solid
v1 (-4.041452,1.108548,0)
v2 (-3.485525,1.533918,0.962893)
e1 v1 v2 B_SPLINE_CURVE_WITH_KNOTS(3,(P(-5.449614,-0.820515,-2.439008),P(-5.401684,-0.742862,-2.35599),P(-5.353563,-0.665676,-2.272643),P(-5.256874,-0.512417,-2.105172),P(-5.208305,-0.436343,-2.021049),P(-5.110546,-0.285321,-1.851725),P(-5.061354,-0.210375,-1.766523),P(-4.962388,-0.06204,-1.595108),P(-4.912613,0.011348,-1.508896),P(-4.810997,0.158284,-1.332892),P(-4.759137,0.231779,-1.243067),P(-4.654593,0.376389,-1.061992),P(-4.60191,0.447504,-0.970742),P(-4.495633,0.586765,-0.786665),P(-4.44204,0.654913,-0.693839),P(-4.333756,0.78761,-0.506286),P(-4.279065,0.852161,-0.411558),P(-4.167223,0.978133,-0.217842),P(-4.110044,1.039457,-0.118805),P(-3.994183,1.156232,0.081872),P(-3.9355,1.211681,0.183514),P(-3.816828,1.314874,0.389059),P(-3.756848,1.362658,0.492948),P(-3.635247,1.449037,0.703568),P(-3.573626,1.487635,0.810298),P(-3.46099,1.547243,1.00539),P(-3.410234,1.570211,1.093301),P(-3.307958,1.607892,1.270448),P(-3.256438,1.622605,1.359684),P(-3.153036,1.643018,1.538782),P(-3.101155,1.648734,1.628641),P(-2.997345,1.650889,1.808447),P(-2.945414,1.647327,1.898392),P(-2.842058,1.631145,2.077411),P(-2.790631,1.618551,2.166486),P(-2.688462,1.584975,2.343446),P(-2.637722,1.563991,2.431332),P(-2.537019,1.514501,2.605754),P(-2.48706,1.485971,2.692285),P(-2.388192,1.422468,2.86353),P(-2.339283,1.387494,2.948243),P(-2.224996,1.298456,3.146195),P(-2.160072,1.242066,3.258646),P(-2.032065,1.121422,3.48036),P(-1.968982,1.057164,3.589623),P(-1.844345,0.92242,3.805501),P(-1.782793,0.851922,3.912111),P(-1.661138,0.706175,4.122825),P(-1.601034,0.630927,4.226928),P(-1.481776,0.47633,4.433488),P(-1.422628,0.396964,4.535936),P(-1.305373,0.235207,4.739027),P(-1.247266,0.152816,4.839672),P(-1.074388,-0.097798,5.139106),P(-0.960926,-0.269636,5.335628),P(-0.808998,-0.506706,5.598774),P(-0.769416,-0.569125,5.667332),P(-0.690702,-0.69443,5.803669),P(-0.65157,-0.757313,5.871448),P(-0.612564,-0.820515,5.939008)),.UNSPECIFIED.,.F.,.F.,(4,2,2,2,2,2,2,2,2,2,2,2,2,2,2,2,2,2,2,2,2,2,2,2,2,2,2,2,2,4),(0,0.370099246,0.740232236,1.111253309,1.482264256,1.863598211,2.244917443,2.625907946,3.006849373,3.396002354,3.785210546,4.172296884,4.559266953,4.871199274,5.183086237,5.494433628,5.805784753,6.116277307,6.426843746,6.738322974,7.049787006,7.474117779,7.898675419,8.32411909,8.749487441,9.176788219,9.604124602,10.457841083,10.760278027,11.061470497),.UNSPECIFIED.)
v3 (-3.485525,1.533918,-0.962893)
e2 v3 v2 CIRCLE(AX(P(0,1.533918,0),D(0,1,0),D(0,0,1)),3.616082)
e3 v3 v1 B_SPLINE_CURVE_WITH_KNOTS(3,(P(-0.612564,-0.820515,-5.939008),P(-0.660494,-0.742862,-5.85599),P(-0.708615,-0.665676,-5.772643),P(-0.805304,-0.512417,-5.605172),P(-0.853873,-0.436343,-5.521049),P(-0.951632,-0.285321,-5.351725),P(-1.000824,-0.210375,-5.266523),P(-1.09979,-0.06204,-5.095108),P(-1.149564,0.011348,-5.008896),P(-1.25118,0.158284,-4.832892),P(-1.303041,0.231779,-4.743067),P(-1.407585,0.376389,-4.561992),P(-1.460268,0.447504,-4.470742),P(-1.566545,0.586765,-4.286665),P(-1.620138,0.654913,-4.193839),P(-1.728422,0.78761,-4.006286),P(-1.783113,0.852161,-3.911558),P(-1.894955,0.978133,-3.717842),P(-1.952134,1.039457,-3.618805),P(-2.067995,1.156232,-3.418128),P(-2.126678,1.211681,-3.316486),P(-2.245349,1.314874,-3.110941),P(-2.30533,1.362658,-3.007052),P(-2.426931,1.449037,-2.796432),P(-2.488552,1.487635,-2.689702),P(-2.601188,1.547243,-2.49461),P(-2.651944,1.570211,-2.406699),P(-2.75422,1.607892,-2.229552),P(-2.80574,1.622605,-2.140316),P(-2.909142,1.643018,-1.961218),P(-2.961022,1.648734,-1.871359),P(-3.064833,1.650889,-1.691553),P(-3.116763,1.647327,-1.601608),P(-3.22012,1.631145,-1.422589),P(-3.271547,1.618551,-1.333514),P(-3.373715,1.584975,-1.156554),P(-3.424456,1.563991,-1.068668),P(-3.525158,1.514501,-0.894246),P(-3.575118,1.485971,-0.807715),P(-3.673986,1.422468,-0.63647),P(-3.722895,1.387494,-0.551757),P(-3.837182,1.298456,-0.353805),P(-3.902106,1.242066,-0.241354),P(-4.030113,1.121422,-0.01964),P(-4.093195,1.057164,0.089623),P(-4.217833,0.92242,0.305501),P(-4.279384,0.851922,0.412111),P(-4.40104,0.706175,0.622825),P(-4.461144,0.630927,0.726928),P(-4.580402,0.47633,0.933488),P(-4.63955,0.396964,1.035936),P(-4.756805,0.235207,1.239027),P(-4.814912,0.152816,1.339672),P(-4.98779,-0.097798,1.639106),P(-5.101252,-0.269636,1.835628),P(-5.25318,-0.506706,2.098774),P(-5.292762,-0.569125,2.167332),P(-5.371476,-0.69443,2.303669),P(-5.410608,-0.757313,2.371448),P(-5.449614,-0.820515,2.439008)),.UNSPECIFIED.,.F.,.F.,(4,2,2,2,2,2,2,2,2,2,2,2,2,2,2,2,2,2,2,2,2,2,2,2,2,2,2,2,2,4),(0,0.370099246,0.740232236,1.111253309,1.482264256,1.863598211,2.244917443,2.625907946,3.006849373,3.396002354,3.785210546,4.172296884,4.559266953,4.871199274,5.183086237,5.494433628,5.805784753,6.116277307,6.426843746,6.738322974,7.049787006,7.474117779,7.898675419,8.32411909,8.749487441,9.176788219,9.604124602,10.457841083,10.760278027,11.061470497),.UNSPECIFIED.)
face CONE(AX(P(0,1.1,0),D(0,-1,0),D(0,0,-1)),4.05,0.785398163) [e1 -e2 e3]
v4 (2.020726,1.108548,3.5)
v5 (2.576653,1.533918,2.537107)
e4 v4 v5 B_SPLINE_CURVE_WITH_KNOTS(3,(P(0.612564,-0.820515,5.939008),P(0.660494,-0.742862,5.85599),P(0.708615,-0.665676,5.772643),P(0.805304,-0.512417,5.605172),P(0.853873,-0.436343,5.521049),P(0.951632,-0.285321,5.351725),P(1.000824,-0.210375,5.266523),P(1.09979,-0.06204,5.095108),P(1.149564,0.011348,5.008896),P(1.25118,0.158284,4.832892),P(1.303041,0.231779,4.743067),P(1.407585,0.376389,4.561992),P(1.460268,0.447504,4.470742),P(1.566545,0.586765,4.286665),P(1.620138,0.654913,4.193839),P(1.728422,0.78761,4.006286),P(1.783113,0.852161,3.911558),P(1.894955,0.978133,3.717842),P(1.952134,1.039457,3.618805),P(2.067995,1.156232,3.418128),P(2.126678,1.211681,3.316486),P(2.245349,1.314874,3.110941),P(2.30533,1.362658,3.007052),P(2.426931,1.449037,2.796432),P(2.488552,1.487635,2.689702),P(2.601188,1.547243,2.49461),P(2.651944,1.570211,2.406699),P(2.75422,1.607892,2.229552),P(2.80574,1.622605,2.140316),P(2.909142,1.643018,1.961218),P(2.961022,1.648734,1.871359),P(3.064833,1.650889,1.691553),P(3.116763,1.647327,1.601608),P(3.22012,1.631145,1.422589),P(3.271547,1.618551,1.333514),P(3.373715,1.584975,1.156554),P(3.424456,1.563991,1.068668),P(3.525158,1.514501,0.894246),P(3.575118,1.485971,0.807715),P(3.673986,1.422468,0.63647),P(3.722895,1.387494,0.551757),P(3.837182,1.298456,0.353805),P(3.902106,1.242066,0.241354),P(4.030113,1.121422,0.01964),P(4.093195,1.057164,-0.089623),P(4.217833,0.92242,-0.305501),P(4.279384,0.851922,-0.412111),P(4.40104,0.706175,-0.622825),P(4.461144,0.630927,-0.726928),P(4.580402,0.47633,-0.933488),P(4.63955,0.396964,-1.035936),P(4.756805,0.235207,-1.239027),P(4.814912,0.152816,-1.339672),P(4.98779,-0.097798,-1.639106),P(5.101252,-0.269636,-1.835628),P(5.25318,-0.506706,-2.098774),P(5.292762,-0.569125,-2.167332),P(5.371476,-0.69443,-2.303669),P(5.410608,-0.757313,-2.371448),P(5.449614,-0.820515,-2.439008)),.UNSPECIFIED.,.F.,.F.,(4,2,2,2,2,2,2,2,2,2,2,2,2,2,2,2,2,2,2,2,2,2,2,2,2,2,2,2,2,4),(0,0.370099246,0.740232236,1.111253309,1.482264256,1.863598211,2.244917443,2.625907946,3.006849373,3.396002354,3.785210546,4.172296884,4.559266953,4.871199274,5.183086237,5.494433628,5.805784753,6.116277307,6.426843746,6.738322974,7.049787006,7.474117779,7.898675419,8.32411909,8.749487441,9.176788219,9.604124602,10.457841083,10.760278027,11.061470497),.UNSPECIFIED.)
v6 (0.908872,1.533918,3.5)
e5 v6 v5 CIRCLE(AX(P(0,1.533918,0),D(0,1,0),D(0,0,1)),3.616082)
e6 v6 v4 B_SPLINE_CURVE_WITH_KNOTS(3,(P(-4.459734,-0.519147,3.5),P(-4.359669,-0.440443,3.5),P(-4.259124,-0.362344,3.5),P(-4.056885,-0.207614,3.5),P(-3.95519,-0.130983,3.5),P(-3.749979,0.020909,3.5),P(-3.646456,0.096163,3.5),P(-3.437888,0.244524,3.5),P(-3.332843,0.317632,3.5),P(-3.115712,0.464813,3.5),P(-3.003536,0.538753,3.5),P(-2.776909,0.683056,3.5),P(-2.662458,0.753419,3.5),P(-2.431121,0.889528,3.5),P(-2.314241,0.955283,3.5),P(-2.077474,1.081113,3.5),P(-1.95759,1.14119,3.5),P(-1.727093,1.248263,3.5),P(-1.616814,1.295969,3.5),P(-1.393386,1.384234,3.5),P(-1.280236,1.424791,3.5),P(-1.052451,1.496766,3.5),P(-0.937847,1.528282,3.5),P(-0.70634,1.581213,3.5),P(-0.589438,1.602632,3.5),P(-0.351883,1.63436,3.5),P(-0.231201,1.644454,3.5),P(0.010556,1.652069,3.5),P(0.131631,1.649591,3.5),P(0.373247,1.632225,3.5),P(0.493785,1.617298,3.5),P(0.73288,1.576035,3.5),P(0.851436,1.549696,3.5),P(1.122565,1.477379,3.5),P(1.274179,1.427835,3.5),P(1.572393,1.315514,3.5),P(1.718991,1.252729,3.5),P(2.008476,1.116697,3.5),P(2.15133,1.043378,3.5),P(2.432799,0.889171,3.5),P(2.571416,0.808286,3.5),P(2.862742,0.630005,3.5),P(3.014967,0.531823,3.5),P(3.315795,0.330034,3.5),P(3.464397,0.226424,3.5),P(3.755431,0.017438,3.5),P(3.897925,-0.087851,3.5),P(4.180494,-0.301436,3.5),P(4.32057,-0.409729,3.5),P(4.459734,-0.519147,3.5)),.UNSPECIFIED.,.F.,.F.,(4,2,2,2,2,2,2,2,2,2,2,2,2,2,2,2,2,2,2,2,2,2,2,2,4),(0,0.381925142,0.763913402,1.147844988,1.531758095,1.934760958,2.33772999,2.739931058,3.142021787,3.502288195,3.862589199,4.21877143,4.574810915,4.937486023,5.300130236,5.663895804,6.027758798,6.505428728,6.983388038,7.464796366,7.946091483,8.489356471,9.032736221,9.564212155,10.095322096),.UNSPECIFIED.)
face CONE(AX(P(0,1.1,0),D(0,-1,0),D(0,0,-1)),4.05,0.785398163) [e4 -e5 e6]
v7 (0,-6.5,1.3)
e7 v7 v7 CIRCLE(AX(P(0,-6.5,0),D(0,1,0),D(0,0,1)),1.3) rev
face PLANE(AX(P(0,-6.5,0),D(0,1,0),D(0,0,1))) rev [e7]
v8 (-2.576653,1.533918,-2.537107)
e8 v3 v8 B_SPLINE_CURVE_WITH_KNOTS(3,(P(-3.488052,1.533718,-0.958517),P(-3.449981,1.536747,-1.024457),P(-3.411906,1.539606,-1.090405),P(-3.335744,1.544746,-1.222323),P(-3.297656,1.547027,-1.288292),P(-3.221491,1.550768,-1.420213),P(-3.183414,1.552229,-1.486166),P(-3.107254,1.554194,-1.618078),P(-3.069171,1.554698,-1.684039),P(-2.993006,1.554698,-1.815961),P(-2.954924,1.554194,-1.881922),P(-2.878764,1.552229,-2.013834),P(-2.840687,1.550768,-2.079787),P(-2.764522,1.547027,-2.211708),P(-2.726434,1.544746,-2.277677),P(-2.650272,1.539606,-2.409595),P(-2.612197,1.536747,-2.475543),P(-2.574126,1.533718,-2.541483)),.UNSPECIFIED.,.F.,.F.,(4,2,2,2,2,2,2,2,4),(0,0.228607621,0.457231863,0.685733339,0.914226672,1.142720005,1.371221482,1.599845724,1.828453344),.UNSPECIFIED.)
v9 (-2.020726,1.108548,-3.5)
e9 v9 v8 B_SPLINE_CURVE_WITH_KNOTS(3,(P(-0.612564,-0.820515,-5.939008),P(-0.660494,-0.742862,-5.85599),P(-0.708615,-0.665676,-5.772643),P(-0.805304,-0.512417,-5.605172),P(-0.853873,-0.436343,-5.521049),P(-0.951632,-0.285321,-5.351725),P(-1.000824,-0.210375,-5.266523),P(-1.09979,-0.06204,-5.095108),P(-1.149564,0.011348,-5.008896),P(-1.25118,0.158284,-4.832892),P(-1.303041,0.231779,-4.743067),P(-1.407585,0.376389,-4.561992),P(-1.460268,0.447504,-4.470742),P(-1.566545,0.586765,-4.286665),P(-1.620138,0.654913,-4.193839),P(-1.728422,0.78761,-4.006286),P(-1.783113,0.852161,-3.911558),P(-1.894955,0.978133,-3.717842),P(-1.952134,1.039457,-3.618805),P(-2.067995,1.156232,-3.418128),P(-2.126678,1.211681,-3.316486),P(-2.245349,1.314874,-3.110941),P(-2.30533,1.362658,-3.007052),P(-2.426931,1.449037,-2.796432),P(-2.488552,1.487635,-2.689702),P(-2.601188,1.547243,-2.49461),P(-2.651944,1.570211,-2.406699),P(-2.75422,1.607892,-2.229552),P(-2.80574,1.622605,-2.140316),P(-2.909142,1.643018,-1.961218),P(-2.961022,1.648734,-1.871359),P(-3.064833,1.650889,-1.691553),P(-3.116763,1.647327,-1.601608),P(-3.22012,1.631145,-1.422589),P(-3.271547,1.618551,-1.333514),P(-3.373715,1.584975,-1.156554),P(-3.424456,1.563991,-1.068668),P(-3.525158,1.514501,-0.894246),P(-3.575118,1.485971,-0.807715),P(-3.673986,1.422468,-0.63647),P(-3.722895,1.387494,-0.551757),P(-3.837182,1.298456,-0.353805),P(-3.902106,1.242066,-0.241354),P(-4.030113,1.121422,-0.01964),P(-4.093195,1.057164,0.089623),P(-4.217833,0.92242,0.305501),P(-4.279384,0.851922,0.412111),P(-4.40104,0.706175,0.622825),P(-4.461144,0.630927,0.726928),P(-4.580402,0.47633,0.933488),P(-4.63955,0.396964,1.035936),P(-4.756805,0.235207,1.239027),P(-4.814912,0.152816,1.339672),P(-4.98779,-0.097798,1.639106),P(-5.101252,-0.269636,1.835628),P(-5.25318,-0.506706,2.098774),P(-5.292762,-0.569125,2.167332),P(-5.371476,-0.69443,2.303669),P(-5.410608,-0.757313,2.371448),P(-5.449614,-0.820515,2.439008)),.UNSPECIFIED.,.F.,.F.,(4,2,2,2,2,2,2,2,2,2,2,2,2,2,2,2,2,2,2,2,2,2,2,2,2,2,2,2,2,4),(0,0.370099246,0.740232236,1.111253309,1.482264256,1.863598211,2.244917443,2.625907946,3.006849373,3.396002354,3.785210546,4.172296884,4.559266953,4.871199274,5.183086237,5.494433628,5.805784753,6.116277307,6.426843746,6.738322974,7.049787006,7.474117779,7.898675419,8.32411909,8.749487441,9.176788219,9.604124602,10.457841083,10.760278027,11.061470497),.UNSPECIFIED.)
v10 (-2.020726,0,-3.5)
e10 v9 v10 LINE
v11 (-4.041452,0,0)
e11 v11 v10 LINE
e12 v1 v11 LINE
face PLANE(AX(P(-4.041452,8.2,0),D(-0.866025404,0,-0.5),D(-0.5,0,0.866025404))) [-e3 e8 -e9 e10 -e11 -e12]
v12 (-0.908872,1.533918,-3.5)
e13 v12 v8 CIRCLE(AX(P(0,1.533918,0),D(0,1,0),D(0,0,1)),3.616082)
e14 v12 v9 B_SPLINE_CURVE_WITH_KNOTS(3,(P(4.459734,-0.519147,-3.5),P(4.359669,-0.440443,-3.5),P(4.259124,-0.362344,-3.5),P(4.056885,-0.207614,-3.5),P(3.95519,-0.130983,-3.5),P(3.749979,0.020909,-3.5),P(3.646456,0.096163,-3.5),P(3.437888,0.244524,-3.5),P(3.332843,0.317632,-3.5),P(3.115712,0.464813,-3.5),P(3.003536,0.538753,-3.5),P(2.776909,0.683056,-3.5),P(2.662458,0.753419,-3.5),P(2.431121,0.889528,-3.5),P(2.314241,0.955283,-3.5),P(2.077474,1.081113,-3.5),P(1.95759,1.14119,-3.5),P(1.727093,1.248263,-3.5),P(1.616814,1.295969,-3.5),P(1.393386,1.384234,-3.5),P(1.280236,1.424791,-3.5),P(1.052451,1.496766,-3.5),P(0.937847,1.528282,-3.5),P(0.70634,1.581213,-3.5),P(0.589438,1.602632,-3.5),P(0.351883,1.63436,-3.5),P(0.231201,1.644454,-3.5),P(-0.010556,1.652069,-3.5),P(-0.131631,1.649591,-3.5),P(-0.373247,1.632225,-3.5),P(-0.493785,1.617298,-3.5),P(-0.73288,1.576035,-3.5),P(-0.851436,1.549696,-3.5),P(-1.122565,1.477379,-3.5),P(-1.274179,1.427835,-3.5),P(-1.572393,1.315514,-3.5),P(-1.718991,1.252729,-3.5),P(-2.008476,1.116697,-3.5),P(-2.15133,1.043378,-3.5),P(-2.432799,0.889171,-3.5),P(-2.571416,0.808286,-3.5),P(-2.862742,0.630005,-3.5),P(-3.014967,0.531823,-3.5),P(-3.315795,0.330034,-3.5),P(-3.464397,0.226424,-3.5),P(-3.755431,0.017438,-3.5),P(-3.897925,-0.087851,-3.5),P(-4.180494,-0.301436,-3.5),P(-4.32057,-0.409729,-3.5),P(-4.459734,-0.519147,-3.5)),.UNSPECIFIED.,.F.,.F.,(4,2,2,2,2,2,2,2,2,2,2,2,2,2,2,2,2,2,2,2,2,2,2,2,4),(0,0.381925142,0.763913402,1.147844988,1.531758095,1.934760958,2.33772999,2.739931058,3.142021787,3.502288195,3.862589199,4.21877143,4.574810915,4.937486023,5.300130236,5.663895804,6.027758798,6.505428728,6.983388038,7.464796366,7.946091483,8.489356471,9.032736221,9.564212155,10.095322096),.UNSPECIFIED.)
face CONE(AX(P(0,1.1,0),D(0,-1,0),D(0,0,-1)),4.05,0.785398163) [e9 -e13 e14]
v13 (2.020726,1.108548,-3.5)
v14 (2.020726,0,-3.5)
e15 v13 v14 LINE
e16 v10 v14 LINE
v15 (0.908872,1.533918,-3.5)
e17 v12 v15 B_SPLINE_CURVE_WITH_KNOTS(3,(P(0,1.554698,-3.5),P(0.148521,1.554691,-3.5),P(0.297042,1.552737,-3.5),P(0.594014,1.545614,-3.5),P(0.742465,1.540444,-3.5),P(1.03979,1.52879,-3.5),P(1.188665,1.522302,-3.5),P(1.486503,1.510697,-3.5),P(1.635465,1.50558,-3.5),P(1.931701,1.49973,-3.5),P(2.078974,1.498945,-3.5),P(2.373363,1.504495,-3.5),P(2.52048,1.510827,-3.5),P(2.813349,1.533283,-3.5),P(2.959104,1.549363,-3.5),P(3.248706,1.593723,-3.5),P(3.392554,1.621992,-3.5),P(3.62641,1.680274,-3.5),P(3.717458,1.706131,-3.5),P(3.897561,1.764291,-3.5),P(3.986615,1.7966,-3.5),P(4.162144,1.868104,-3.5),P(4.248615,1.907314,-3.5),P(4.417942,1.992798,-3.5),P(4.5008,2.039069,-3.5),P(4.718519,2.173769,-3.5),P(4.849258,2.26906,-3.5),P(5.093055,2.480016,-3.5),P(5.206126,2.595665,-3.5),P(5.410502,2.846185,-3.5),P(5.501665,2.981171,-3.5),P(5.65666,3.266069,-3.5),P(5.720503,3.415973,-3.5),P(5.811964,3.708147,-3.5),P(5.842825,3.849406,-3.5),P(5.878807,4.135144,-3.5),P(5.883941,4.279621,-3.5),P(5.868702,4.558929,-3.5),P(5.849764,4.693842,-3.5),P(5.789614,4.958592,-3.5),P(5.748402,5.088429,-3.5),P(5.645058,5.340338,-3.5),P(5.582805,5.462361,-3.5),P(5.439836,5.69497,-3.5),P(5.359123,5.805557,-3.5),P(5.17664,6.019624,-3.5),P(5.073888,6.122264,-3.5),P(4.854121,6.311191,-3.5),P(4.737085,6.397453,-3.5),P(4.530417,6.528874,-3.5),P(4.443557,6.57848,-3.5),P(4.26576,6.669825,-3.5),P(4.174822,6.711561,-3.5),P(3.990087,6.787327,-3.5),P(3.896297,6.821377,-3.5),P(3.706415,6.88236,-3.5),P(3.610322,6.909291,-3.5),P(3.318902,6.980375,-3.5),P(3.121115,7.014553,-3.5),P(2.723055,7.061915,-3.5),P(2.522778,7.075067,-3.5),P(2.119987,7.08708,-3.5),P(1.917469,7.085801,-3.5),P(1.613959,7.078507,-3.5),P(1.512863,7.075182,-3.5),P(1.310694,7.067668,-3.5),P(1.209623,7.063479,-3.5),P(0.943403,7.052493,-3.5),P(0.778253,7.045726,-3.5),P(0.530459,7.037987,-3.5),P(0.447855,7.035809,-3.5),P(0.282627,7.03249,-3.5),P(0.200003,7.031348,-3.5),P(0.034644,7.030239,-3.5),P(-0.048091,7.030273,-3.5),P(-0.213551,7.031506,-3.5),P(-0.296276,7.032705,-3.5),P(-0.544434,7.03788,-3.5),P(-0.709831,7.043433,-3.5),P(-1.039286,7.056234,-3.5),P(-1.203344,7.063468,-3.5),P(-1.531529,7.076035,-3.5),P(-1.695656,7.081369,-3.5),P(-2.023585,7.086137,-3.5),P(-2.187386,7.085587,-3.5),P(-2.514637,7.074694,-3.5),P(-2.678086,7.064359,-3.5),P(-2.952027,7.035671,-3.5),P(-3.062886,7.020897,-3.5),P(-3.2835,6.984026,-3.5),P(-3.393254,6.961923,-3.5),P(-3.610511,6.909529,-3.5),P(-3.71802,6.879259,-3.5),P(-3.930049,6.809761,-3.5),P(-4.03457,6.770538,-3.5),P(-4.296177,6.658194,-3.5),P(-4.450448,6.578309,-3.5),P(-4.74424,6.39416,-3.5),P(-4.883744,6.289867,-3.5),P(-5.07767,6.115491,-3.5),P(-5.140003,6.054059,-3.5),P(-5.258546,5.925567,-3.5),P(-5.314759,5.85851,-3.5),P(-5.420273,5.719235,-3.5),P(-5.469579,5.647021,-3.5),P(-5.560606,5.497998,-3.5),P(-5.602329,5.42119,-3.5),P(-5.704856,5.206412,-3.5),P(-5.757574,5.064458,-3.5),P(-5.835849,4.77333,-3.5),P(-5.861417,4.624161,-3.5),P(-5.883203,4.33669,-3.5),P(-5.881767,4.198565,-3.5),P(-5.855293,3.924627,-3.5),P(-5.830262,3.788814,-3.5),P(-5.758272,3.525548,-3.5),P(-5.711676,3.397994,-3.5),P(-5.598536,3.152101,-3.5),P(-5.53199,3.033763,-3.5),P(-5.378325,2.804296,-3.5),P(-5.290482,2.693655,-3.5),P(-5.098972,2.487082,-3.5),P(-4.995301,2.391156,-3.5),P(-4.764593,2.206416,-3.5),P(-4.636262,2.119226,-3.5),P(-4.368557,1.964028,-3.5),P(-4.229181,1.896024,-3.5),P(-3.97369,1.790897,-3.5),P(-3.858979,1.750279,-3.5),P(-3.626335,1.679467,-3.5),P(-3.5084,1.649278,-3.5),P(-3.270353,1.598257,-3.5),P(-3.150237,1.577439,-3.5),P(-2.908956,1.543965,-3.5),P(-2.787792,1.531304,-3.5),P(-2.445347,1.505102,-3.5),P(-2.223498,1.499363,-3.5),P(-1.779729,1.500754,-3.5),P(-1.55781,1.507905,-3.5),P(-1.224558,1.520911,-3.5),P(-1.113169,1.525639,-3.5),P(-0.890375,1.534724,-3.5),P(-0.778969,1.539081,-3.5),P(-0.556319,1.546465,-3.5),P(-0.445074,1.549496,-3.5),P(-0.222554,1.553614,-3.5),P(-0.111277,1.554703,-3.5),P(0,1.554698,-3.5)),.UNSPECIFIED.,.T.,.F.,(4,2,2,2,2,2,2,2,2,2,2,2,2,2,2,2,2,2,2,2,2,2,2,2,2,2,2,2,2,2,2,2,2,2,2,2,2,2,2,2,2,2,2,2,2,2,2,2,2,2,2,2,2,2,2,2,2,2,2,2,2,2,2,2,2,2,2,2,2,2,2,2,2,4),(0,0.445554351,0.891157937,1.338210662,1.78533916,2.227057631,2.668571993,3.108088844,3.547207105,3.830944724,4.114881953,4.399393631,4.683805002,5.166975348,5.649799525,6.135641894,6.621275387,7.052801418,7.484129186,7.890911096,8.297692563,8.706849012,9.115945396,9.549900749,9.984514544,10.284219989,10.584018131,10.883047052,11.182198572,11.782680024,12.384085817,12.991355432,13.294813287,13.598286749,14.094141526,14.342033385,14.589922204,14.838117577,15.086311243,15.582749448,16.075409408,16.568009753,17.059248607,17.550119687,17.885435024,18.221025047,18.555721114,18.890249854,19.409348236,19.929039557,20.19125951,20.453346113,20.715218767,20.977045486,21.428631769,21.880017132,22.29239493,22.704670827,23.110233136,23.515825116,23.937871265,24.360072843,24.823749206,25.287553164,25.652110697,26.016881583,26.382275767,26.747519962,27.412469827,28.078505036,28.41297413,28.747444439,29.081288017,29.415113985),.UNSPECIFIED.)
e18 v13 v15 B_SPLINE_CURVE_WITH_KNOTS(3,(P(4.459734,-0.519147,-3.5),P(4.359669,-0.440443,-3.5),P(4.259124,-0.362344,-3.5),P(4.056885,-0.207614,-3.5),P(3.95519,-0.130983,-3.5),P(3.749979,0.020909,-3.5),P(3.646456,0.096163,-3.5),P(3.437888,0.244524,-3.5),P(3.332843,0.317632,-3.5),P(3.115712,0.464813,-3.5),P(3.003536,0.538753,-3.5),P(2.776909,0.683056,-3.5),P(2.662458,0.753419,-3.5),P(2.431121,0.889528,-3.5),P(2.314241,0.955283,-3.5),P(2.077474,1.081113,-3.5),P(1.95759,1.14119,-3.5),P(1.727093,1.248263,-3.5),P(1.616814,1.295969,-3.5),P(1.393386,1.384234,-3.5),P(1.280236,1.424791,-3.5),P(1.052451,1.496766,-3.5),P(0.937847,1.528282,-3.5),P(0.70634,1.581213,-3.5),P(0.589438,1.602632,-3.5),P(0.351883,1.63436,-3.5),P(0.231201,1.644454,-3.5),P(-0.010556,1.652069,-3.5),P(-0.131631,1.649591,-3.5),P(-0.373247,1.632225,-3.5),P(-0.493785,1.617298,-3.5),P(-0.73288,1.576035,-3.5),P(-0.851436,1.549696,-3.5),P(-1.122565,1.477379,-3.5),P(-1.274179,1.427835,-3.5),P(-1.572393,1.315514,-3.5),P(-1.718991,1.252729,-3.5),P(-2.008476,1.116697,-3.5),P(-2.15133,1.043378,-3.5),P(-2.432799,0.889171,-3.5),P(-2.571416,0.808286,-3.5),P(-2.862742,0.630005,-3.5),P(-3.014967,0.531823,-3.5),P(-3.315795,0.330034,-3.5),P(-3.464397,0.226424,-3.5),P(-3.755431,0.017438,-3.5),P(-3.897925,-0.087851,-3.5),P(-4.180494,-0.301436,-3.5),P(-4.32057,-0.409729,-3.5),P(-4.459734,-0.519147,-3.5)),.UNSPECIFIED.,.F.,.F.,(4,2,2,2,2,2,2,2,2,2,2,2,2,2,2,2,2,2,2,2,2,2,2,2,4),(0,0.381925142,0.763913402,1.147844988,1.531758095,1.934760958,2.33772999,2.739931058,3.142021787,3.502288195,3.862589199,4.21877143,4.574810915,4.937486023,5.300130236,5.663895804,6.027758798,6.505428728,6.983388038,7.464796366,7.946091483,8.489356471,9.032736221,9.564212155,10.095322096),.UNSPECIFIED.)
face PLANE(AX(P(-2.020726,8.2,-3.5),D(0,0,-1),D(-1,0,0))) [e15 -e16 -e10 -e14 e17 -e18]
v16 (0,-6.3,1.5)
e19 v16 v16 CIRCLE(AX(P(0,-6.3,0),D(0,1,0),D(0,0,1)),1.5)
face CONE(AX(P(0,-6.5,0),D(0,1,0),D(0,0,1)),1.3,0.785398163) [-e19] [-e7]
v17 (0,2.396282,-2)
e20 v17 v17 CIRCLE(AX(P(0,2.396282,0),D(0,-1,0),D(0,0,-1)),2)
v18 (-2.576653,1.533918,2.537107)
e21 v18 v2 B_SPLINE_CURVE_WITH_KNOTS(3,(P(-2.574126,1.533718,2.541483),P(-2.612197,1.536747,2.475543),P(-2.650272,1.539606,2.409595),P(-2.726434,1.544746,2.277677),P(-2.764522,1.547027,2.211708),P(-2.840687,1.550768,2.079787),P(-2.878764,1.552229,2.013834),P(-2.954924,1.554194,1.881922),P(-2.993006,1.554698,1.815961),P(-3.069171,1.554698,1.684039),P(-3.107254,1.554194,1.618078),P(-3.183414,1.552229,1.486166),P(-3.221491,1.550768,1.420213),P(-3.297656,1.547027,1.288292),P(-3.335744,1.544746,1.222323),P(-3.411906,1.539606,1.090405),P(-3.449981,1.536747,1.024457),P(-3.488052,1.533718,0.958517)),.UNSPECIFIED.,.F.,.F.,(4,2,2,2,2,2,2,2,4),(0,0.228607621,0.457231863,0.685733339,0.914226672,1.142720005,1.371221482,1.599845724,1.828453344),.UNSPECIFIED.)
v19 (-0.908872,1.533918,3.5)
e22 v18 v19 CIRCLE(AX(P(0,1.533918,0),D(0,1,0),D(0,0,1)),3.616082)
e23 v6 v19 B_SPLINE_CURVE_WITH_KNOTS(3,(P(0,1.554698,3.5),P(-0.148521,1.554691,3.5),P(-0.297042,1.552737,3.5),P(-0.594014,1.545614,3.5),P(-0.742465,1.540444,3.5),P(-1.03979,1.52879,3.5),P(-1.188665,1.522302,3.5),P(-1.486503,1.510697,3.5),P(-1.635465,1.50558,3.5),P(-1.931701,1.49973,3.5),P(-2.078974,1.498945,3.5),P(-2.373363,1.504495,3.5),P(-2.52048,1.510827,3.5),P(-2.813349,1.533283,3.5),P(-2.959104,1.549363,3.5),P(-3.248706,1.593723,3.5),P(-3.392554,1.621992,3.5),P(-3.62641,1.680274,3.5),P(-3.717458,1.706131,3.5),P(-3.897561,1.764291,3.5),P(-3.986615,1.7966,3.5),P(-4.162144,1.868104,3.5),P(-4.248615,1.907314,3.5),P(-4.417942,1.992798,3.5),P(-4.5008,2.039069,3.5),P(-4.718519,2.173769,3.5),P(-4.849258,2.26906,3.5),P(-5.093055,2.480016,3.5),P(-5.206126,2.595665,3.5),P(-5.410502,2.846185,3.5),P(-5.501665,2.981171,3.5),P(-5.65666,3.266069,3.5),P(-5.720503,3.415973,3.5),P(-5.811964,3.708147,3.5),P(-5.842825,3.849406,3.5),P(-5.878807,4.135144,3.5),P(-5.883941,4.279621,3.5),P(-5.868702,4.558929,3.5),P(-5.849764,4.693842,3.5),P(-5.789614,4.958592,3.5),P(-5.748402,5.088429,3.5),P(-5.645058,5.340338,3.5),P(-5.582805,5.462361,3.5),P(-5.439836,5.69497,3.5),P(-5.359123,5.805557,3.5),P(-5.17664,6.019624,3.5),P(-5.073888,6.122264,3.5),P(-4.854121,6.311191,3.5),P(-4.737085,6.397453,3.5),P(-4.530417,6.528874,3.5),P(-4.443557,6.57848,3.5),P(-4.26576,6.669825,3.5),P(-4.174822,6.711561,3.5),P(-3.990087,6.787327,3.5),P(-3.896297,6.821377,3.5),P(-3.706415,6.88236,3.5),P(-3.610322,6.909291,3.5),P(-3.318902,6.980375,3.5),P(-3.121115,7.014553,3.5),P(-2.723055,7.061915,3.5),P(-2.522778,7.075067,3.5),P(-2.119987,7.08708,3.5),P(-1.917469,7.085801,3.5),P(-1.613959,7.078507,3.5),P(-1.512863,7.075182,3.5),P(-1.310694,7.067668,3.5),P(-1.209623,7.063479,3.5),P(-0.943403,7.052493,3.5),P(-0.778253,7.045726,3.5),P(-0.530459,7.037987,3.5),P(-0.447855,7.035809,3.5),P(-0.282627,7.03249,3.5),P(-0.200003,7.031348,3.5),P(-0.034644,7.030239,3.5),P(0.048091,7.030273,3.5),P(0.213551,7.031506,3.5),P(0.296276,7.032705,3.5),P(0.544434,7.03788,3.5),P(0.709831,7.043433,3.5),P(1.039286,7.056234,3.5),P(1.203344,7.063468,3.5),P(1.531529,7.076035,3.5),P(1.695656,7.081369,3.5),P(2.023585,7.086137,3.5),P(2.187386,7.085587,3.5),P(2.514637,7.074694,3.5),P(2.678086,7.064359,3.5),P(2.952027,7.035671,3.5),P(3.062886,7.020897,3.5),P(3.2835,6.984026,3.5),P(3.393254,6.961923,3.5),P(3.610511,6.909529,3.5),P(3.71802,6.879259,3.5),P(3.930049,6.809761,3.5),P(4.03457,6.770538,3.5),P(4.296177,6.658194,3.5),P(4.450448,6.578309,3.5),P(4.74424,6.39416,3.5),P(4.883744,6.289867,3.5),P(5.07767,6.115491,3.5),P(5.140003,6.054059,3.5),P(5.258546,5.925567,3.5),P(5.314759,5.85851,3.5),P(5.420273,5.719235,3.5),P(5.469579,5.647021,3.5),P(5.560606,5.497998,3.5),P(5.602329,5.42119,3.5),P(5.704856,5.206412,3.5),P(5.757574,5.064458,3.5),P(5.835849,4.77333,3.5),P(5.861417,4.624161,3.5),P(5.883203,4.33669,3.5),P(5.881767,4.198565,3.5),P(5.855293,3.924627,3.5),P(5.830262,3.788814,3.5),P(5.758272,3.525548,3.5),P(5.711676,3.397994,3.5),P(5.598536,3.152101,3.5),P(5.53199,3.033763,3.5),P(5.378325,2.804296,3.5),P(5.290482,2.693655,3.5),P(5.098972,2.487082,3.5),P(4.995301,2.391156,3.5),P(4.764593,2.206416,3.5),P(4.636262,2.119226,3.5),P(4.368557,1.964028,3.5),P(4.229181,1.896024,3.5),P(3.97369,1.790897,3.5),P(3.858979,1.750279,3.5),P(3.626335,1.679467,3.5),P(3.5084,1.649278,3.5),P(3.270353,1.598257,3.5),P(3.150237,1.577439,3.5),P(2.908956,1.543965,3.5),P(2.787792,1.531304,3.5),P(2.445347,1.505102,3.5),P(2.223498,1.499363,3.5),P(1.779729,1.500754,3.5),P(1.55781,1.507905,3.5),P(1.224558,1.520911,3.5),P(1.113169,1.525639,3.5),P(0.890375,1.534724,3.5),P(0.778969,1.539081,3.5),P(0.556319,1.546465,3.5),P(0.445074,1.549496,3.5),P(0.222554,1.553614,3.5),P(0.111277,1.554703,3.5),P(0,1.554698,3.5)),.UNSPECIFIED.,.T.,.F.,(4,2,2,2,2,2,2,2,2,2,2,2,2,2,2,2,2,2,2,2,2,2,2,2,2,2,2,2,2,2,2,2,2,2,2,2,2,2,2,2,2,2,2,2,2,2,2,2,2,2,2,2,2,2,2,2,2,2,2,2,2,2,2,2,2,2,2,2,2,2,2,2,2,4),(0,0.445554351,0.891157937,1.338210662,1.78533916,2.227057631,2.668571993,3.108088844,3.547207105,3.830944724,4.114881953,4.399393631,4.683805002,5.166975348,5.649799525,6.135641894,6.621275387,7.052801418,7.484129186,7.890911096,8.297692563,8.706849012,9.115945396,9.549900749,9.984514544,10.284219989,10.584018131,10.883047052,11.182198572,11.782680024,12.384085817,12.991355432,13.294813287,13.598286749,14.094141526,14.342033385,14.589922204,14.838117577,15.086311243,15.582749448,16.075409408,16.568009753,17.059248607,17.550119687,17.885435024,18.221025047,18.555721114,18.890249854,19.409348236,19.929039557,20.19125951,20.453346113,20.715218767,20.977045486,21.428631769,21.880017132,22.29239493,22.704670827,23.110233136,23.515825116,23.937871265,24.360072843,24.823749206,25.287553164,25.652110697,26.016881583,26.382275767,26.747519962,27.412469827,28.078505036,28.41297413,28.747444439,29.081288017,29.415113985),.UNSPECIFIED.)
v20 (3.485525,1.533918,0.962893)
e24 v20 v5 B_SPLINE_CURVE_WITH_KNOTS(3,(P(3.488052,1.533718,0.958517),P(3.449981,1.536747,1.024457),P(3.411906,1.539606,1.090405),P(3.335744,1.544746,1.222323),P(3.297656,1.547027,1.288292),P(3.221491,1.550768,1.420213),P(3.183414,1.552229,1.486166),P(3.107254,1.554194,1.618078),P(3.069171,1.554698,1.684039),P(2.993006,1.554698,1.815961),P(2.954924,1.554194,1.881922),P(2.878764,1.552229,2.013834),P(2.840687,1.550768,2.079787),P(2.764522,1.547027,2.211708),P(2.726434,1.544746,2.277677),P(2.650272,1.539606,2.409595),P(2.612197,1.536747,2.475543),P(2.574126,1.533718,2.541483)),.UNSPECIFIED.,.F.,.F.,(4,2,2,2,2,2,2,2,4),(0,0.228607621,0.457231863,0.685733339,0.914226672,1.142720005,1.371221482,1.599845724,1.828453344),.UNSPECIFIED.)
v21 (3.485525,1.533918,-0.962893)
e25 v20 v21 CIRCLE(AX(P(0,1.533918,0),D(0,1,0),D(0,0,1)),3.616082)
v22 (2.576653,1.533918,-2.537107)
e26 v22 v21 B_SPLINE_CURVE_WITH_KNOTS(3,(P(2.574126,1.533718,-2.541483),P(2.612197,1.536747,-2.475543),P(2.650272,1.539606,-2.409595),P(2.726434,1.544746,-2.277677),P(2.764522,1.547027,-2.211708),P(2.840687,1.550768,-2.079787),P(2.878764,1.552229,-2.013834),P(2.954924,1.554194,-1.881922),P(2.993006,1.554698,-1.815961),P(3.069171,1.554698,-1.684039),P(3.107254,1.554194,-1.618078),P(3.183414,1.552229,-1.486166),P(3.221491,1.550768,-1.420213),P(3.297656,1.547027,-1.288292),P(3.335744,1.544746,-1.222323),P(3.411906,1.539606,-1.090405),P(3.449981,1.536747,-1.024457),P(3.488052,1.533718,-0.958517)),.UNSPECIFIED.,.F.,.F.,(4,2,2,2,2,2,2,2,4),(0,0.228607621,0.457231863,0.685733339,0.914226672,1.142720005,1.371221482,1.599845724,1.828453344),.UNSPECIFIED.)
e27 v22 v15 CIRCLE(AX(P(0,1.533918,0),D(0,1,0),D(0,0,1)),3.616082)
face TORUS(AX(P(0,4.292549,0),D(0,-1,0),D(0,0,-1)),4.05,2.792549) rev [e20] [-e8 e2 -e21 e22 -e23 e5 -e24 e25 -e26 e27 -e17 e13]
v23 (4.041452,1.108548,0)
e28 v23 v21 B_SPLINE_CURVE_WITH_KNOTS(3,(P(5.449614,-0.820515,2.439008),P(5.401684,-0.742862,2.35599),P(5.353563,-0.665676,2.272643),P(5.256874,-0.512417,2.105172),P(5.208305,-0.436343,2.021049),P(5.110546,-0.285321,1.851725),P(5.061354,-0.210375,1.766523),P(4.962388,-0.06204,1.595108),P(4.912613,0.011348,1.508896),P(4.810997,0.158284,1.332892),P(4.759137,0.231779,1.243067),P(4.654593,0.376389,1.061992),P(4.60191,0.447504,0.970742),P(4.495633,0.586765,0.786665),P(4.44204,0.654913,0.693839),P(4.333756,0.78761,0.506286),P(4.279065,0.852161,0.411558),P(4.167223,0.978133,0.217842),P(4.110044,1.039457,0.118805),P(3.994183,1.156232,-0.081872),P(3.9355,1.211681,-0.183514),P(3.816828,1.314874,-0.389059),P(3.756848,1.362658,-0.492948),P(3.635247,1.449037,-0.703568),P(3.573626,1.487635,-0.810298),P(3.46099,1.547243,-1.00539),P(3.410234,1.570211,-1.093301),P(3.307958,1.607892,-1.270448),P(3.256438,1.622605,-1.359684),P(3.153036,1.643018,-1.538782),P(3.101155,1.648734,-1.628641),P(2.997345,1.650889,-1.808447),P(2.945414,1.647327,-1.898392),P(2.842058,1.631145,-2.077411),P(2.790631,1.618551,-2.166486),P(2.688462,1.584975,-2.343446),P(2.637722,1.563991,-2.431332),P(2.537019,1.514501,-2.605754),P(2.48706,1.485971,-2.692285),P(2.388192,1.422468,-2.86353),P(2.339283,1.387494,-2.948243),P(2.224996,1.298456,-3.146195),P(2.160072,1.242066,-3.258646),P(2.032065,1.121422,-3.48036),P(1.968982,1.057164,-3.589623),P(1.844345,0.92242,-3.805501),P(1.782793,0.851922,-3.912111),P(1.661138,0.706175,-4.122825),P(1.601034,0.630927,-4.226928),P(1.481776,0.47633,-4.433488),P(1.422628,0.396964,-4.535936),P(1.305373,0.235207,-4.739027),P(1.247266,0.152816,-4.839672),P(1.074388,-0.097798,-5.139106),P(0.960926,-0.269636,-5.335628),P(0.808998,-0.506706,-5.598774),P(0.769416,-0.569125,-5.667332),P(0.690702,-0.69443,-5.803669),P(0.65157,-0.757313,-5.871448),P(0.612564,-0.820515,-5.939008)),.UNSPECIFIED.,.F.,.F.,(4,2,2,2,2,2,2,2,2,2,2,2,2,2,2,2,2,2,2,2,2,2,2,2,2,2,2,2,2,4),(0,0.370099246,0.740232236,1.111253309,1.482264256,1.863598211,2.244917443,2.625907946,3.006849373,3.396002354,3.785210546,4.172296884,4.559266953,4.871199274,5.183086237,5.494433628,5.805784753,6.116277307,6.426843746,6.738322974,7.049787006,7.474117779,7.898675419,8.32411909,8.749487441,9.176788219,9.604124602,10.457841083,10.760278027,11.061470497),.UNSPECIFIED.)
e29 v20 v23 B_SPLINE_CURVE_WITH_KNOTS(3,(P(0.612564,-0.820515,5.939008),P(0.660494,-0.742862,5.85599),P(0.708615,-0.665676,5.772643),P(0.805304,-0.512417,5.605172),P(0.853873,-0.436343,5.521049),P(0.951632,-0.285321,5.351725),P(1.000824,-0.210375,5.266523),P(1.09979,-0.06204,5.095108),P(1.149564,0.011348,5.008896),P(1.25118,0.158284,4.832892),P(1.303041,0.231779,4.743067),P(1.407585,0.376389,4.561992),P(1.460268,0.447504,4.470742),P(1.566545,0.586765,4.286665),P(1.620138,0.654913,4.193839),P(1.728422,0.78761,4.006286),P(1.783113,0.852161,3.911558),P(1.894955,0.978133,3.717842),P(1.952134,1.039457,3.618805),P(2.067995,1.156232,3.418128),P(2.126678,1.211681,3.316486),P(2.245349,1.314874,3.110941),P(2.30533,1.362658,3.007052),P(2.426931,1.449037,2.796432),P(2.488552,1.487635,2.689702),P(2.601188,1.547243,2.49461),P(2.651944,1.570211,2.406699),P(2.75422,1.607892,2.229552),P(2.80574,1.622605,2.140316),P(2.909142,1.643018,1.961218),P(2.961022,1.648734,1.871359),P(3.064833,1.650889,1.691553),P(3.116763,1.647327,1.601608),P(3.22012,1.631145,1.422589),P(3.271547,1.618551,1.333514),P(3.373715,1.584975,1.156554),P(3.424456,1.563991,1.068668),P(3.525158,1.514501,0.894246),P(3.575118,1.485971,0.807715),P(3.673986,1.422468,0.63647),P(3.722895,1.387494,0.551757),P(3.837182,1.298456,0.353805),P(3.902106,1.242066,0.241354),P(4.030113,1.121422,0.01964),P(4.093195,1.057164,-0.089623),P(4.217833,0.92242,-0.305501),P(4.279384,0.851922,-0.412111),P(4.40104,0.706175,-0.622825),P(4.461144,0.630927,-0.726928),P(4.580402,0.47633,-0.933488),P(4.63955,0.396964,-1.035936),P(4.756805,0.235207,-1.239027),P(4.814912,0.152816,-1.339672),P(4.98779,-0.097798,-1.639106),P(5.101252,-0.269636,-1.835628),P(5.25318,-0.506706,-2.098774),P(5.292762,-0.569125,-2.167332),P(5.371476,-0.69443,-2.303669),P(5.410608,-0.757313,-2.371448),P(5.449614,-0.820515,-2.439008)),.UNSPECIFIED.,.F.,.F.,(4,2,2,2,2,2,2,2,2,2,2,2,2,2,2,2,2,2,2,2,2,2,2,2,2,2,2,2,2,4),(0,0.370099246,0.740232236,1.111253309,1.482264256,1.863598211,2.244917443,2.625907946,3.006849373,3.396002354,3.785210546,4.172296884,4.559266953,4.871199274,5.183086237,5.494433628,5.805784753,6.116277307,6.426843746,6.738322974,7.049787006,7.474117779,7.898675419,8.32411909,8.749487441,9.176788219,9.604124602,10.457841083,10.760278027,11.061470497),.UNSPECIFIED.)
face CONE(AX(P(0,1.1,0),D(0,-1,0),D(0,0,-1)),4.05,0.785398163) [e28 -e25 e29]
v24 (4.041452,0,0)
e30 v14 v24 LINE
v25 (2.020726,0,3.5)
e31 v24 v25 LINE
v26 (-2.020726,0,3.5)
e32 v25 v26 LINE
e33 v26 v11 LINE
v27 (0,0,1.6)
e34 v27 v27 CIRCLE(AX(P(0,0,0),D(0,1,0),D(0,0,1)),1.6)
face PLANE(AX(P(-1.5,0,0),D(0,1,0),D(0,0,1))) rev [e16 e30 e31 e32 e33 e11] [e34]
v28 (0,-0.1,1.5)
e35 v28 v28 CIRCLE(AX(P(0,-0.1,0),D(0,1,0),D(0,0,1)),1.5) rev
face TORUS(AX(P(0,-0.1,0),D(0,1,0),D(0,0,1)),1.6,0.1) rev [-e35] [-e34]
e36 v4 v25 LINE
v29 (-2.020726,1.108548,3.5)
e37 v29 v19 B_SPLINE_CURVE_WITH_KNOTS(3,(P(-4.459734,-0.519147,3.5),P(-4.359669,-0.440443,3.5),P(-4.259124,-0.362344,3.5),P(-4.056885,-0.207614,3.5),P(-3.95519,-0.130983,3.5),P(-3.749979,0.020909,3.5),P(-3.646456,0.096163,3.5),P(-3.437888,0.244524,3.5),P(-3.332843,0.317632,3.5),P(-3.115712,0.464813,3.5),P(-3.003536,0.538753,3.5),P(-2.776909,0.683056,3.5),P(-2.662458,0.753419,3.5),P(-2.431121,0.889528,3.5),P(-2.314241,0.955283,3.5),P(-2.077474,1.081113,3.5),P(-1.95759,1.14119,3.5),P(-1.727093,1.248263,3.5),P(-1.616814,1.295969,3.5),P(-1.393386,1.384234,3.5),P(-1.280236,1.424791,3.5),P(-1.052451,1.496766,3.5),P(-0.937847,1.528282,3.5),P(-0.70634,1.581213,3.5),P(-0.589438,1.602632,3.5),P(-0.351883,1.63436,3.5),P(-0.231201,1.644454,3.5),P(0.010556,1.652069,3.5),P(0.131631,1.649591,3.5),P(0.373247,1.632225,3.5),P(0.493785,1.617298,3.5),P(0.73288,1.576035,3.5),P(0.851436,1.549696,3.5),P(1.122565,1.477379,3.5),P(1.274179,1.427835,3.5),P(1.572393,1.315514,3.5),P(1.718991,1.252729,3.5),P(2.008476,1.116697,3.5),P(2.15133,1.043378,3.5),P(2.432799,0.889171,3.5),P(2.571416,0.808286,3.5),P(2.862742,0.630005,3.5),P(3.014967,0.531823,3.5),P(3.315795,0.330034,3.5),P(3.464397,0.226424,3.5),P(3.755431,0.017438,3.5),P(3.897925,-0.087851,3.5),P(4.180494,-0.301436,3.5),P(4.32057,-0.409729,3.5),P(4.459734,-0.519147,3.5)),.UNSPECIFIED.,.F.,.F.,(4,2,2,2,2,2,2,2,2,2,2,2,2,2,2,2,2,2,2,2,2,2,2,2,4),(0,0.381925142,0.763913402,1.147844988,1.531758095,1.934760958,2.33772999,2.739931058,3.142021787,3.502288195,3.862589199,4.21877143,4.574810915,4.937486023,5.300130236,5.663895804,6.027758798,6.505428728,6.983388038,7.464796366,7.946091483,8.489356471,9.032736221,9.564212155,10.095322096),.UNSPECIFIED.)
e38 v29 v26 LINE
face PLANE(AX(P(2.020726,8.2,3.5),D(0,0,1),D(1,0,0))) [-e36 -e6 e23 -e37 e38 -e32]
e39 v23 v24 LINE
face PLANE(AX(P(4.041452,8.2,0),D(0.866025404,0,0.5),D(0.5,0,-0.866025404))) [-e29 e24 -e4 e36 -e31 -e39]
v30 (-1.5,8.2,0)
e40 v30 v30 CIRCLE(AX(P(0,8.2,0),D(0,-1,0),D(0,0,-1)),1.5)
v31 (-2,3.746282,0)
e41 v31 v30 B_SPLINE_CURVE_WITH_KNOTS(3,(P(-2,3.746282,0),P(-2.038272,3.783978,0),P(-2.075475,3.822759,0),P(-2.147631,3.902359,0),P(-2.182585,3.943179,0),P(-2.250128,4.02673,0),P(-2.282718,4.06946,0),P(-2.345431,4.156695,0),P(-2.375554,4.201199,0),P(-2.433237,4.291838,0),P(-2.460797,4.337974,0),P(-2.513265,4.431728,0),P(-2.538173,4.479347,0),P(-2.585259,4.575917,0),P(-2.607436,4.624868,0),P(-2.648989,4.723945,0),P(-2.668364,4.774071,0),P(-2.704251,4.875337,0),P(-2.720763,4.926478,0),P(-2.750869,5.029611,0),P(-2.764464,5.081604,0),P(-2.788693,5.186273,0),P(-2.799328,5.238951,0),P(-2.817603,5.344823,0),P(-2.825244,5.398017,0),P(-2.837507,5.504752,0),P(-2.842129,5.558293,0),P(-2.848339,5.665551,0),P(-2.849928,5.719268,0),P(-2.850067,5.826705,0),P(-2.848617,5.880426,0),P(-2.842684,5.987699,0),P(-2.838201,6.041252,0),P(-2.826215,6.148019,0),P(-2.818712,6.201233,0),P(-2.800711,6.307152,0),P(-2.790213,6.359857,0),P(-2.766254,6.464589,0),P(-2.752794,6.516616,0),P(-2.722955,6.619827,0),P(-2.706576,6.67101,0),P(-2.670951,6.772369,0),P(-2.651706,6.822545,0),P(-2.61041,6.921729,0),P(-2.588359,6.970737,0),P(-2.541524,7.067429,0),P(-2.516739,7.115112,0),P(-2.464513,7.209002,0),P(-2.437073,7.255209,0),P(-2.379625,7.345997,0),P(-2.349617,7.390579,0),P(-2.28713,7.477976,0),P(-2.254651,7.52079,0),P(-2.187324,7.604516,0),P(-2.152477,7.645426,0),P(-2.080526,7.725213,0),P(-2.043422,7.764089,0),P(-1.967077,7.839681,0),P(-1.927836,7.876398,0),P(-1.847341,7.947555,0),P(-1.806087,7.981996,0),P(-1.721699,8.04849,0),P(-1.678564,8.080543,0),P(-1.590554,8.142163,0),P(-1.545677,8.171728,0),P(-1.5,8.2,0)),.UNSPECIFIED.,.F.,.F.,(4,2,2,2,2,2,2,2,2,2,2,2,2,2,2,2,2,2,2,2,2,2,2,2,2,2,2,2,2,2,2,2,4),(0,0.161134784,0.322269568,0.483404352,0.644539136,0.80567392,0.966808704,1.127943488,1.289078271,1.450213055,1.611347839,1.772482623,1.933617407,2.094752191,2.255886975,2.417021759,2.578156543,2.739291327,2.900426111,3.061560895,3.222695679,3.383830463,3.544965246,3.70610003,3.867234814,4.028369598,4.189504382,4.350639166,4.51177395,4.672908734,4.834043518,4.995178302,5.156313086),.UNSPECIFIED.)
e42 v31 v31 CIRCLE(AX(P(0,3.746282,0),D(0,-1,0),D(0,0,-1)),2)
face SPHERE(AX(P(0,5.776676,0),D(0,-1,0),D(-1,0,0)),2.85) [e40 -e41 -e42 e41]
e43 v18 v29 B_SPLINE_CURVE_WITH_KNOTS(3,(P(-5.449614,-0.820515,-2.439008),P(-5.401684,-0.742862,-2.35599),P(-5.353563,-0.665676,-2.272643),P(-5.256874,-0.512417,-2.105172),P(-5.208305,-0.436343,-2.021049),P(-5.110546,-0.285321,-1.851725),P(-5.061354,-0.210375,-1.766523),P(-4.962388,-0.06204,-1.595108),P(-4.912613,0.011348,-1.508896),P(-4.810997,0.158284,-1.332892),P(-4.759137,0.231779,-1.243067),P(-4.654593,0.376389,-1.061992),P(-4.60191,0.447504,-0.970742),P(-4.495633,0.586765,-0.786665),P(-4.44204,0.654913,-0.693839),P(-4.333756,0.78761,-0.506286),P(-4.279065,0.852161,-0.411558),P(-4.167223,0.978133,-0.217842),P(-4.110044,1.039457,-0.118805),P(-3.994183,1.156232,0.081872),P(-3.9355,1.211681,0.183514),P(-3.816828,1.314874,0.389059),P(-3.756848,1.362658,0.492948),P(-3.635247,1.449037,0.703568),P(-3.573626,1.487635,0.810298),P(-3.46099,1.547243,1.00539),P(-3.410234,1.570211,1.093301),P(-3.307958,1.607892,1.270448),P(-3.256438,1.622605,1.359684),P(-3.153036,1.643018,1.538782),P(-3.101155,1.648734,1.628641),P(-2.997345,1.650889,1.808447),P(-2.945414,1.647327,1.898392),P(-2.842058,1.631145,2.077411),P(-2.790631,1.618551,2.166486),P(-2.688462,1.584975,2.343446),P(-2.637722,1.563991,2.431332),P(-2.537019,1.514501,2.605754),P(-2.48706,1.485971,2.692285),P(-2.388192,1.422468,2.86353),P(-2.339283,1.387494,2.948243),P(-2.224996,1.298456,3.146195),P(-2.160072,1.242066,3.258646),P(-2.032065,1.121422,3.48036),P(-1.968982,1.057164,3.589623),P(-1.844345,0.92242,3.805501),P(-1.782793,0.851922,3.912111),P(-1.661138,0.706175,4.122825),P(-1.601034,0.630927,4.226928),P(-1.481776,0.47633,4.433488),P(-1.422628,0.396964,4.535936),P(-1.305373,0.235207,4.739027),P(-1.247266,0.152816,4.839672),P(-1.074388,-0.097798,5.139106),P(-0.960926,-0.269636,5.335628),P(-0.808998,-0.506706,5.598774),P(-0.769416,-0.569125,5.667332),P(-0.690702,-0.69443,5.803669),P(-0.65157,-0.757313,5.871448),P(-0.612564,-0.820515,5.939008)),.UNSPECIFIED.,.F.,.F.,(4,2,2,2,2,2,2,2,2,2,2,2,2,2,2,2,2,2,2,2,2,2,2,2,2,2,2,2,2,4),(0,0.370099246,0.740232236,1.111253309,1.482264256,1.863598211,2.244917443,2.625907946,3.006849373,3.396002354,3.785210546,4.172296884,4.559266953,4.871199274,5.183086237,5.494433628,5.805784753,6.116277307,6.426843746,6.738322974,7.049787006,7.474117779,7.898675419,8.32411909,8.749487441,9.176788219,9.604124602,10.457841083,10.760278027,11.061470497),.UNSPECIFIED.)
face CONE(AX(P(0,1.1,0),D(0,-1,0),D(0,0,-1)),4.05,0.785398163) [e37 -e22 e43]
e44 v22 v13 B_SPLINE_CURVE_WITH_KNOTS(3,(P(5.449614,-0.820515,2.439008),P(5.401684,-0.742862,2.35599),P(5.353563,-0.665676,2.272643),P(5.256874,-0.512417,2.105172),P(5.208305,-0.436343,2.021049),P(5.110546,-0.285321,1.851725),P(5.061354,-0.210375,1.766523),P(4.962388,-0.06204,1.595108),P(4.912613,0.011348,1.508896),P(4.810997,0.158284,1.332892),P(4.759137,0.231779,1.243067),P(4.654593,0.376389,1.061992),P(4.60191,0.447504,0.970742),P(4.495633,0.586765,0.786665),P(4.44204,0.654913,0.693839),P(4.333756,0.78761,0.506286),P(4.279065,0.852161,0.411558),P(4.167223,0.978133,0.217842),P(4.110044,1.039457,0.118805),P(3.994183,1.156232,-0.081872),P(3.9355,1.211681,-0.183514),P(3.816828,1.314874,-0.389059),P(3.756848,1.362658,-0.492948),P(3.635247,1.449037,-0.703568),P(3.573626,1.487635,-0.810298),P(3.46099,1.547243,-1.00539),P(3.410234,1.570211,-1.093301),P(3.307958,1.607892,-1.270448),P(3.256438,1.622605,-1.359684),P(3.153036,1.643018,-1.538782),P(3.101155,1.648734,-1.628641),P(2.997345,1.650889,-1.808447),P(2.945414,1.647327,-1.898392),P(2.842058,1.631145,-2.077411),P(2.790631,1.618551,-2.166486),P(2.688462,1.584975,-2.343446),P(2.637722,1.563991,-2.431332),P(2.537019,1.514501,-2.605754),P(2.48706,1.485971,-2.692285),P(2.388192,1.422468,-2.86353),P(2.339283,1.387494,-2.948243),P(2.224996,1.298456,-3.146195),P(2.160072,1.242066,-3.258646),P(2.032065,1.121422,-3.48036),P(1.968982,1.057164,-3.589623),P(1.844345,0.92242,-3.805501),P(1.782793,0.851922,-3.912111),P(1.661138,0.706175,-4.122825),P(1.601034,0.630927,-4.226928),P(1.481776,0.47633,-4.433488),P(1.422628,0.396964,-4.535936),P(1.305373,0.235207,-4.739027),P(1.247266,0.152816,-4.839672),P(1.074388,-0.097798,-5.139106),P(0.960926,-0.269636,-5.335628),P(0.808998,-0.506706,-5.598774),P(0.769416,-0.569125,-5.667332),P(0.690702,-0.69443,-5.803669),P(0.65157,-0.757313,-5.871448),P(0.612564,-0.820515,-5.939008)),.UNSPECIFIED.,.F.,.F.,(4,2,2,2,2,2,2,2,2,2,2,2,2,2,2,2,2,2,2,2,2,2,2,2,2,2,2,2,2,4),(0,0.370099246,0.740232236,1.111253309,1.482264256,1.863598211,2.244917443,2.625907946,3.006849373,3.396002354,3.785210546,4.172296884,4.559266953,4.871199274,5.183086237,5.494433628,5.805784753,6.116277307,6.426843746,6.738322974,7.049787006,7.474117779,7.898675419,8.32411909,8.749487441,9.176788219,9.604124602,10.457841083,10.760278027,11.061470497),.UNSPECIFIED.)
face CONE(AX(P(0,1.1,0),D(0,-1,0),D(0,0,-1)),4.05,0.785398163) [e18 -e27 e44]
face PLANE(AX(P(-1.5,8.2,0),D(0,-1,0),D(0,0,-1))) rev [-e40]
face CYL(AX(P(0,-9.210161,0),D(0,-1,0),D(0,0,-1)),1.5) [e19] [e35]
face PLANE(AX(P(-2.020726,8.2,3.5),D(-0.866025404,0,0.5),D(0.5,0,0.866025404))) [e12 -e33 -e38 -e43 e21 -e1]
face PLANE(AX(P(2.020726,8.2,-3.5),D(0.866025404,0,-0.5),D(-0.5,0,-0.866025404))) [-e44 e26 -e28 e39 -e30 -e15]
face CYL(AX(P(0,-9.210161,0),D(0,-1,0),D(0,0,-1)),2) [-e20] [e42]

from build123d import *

# Parameters (mm, degrees)
CHANFREIN1_SIZE         = 0.4
ESQUISSE2_OUTSIDE_W     = 13.828
ESQUISSE2_OUTSIDE_H     = 13.828
ENL_V_MAT_EXTRU_1_DEPTH = 11.002249747
CHANFREIN2_SIZE         = 0.2
CONG_2_R                = 0.1


with BuildPart() as part:
    # Esquisse1 → Révolution1 (revolve)
    with BuildSketch(Plane.XY, mode=Mode.PRIVATE) as r_volution1_sk:
        with BuildLine():
            Line((0, -6.5), (-1.5, -6.5))
            Line((-1.5, -6.5), (-1.5, 0))
            Line((-1.5, 0), (-4.05, 0))
            Line((-4.05, 0), (-4.05, 1.5))
            ThreePointArc((-4.05, 1.5), (-2.931315388, 1.73386291), (-2, 2.396281786))
            Line((-2, 2.396281786), (-2, 3.746281786))
            ThreePointArc((-2, 3.746281786), (-2.832207881, 6.094635769), (-1.5, 8.2))
            Line((-1.5, 8.2), (0, 8.2))
            Line((0, 8.2), (0, -6.5))
        make_face()
    revolve(r_volution1_sk.sketch.rotate(Axis((0, -9.21016139, 0), (0, 1, 0)), 270), axis=Axis((0, -9.21016139, 0), (0, 1, 0)))

    # Chanfrein1
    # the kernel refuses this chamfer: 0.4 mm, written as the material it takes off along each edge
    with BuildSketch(Plane(origin=(0, 1.5, 0), x_dir=(0, 0, -1), z_dir=(1, 0, 0))) as chanfrein1_piece_1:
        with BuildLine():
            Line((4.05, -CHANFREIN1_SIZE), (3.616082015, 0.033917985))
            ThreePointArc((3.616082015, 0.033917985), (3.826287877, 0.008975254), (4.05, 0))
            Line((4.05, 0), (4.05, -CHANFREIN1_SIZE))
        make_face()
    revolve(axis=Axis((0, 1.5, 0), (0, 1, 0)), mode=Mode.SUBTRACT)

    # Esquisse2 outside → Enlèv. mat.-Extru.1 (cut, through all)
    with BuildSketch(Plane.XZ):
        Rectangle(ESQUISSE2_OUTSIDE_W, ESQUISSE2_OUTSIDE_H)
        Polygon((2.020725942, 3.5), (-2.020725942, 3.5), (-4.041451884, 0), (-2.020725942, -3.5), (2.020725942, -3.5), (4.041451884, 0), align=None, mode=Mode.SUBTRACT)
    extrude(amount=-ENL_V_MAT_EXTRU_1_DEPTH, mode=Mode.SUBTRACT)

    # Chanfrein2
    chanfrein2_edges = [part.edges().sort_by_distance(p)[0] for p in [
        (0, -6.5, 1.5),
    ]]
    chamfer(chanfrein2_edges, length=CHANFREIN2_SIZE)

    # Congé2
    cong_2_edges = [part.edges().sort_by_distance(p)[0] for p in [
        (0, 0, 1.5),
    ]]
    fillet(cong_2_edges, radius=CONG_2_R)


solid = part.part
